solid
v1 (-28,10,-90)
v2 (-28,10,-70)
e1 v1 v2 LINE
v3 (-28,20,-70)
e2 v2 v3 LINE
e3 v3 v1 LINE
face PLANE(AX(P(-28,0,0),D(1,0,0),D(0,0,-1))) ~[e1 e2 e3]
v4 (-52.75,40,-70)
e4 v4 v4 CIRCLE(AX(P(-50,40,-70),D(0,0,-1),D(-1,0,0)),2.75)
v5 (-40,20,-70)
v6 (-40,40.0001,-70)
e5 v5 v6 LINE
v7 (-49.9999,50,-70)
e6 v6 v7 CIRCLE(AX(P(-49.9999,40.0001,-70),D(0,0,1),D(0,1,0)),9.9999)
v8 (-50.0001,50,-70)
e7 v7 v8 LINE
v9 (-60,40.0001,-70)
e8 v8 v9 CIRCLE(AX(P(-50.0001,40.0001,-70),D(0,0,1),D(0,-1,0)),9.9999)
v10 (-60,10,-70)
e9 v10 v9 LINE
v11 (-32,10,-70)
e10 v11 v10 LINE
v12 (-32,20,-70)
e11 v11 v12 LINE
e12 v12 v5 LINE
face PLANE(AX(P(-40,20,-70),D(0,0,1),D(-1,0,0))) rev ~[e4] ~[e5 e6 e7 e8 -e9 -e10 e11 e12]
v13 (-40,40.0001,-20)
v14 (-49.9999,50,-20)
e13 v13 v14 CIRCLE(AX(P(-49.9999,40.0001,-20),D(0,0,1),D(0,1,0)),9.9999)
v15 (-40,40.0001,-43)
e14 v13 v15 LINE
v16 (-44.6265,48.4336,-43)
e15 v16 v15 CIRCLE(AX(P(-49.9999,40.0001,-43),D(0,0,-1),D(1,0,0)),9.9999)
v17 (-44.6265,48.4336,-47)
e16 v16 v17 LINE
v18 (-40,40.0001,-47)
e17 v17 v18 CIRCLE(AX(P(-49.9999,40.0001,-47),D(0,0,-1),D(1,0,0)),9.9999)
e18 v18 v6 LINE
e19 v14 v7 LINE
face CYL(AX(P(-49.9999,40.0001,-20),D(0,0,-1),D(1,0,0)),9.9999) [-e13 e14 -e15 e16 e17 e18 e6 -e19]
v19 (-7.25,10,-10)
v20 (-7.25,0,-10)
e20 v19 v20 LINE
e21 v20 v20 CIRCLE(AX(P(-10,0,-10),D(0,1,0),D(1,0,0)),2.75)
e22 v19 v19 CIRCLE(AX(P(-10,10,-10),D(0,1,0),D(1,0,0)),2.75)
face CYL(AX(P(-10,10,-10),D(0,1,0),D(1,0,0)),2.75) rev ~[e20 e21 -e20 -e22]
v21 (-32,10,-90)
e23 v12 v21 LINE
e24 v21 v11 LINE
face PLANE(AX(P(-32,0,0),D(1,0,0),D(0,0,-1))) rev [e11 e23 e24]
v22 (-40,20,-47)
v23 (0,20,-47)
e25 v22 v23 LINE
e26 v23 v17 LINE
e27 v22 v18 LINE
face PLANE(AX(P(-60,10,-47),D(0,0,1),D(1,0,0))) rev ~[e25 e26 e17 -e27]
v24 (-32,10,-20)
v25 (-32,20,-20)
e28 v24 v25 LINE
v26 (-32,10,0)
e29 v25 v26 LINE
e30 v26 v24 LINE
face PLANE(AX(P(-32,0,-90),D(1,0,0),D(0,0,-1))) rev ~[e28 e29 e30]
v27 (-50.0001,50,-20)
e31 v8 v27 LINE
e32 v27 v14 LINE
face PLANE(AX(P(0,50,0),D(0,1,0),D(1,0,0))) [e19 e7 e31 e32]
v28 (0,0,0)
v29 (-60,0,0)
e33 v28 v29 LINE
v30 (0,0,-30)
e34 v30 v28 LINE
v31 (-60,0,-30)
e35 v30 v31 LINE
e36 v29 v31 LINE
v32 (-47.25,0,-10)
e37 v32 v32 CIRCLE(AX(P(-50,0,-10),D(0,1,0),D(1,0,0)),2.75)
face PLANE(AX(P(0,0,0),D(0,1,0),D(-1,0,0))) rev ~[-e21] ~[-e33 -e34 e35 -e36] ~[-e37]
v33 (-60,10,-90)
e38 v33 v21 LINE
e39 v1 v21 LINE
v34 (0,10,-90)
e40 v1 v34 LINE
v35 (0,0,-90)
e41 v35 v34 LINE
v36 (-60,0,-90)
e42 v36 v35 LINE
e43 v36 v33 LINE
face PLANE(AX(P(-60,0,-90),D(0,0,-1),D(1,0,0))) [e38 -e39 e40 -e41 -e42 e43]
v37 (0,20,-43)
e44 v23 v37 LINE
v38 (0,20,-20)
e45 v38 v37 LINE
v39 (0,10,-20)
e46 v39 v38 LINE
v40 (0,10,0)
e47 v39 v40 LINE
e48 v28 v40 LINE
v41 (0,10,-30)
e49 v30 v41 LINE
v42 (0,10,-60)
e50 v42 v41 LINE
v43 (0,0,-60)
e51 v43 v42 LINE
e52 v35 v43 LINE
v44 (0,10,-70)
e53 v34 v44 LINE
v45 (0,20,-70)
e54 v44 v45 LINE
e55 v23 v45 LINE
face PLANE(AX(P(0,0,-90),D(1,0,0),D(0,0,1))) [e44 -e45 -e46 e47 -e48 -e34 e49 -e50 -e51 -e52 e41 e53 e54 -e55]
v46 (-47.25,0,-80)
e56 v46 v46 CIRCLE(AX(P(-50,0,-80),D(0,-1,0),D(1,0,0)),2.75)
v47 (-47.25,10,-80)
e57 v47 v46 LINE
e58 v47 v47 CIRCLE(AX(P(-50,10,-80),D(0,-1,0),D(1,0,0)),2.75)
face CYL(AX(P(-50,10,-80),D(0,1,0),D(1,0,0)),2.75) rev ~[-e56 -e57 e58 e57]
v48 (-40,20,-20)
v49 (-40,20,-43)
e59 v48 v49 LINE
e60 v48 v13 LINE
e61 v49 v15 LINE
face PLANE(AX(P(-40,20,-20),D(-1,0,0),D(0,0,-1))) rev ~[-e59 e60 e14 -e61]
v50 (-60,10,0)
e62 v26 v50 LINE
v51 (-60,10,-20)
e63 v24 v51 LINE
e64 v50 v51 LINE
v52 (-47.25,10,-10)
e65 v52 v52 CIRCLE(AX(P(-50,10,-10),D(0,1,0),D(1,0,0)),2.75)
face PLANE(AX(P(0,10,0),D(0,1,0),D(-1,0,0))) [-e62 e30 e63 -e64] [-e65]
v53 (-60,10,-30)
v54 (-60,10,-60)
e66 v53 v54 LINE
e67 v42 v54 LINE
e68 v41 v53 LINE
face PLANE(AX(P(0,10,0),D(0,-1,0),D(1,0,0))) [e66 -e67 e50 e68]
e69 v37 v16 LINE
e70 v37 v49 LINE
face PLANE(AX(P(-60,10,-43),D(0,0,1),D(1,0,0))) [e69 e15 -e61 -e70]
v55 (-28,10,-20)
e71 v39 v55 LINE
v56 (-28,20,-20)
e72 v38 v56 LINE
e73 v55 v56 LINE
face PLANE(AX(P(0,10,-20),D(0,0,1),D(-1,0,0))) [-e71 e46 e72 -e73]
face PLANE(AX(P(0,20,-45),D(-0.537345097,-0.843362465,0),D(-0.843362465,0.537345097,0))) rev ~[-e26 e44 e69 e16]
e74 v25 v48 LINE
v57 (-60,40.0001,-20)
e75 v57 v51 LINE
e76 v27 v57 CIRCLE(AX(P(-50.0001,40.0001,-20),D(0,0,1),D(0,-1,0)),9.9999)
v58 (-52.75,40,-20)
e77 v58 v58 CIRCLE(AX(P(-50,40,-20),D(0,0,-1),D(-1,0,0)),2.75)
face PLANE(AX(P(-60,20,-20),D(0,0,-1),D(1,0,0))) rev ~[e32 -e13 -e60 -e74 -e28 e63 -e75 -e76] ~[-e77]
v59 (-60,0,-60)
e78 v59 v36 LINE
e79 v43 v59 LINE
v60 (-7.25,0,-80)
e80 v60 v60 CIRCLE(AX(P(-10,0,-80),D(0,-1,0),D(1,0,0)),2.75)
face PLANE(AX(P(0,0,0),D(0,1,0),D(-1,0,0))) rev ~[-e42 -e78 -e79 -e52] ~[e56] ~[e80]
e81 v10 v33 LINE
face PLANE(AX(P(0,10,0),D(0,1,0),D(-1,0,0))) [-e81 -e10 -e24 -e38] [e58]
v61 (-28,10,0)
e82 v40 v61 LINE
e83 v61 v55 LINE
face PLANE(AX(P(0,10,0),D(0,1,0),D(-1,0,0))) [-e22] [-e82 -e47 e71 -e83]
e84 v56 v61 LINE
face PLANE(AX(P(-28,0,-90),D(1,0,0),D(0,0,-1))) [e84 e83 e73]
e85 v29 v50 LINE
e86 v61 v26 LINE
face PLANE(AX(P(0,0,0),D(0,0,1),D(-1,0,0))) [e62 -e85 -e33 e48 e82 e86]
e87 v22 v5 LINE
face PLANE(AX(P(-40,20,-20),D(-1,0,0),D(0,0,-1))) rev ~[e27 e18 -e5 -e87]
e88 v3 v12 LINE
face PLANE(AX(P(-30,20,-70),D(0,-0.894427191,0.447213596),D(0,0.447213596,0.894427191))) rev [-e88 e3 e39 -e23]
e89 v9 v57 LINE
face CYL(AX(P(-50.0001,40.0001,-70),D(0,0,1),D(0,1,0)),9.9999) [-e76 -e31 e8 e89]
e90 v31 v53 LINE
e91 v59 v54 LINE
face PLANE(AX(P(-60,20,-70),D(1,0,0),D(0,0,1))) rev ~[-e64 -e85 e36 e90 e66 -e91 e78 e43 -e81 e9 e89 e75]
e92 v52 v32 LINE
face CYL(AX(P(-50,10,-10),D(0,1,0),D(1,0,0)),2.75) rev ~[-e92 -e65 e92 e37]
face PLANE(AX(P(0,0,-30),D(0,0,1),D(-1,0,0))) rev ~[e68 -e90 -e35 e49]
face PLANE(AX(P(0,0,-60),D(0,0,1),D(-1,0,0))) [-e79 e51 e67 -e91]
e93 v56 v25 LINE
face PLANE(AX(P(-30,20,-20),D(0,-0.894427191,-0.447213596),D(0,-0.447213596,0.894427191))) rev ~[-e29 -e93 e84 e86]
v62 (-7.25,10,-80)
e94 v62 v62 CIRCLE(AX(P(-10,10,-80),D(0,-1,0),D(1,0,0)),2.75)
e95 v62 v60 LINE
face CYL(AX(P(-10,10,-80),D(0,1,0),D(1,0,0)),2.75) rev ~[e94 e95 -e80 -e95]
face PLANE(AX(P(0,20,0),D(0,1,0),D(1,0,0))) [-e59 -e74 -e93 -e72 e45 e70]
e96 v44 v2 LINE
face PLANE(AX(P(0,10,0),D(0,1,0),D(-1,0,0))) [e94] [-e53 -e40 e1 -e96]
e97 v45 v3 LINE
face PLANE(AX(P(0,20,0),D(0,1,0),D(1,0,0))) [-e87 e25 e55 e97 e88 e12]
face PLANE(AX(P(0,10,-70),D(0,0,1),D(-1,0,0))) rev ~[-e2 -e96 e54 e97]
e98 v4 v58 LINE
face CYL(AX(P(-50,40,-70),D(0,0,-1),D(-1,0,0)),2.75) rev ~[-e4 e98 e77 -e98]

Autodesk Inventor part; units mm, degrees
sketch "Sketch1" plane through (0, 0, 0) normal (0, 1, 0) x (-1, 0, 0)
  line L0 (0, 0) -> (60, 0)
  line L1 (60, 0) -> (60, -90)
  line L2 (60, -90) -> (0, -90)
  line L3 (0, -90) -> (0, 0)
  dimension "d0" = 60
  dimension "d1" = 90
extrude "Extrusion1" add sketch "Sketch1" along normal blind 10
sketch "Sketch2" plane through (0, 10, 0) normal (0, 1, 0) x (1, 0, 0)
  line L0 (0, 20) -> (-60, 20)
  line L1 (0, 70) -> (-60, 70)
  line L2 (-60, 70) -> (-60, 20)
  line L3 (0, 20) -> (0, 70)
  point P0 (0, 0)
extrude "Extrusion2" add sketch "Sketch2" along normal blind 10
sketch "Sketch3" plane through (0, 0, 0) normal (0, -1, 0) x (1, 0, 0)
  line L0 (0, -30) -> (-60, -30)
  line L1 (-60, -30) -> (-60, -60)
  line L2 (0, -90) -> (0, -60)
  line L3 (0, -60) -> (-60, -60)
  line L4 (0, -60) -> (0, -30)
  dimension "d9" = 30
extrude "Extrusion3" cut sketch "Sketch3" against normal blind 10
sketch "Sketch4" plane through (0, 10, 0) normal (0, 1, 0) x (1, 0, 0)
  circle A0 centre (-10, 10) radius 2.75
  circle A1 centre (-50, 10) radius 2.75
  dimension "d13" = 5.5
  dimension "d14" = 5.5
extrude "Extrusion4" cut sketch "Sketch4" against normal blind 10
ref_plane "Work Plane1" through (-30, 0, -90) normal (1, 0, 0) x (0, 0, -1)
sketch "Sketch5" plane through (-30, 0, -90) normal (1, 0, 0) x (0, 0, -1)
  line L0 (-70, 10) -> (-70, 20) projected
  line L1 (-90, 10) -> (-70, 10) projected
  line L2 (-70, 20) -> (-90, 10)
  line L3 (-90, 10) -> (-70, 10)
  line L4 (-70, 10) -> (-70, 20)
  point P0 (-90, 0)
extrude "Extrusion5" add sketch "Sketch5" along normal mid plane 4
ref_plane "Work Plane2" through (-60, 0, -45) normal (0, 0, 1) x (1, 0, 0)
mirror "Mirror1" about plane through (-60, 0, -45) normal (0, 0, 1) of "Extrusion4", "Extrusion5"
sketch "Sketch6" plane through (0, 20, 0) normal (0, 1, 0) x (1, 0, 0)
  line L0 (-32, 70) -> (-60, 70) projected
  line L1 (-40, 20) -> (-40, 70)
  line L2 (-60, 70) -> (-40, 70)
  line L3 (-60, 70) -> (-60, 20)
  line L4 (-60, 20) -> (-40, 20)
  point P0 (0, 0)
  point P1 (0, 20)
extrude "Extrusion6" add sketch "Sketch6" along normal blind 30
fillet "Fillet1" radius 10 2 edges at (-40, 50, -45) (-60, 50, -45)
sketch "Sketch7" plane through (-32, 10, -70) normal (0, 0, -1) x (-1, 0, 0)
  arc A0 (28, 30) -> (8, 30) centre (18, 30) ccw projected
  circle A1 centre (18, 30) radius 2.75
  point P0 (-32, -10)
  dimension "d24" = 5.5
extrude "Extrusion7" cut sketch "Sketch7" against normal blind 50
ref_plane "Work Plane3" through (-60, 10, -45) normal (0, 0, 1) x (1, 0, 0)
sketch "Sketch8" plane through (-60, 10, -45) normal (0, 0, 1) x (1, 0, 0)
  line L0 (32, 10) -> (60, 10) projected
  line L1 (60, 10) -> (15.3735, 38.4336)
  arc A0 (20, 30) -> (0, 30) centre (10, 30) ccw projected
  line L2 (15.3735, 38.4336) -> (15.3735, 10)
  line L3 (15.3735, 10) -> (60, 10)
  point P0 (60, -10)
extrude "Extrusion8" add sketch "Sketch8" along normal mid plane 4
properties part number "MMAE 232 Assignment 1_Part 1 - Dylan Tamras"
